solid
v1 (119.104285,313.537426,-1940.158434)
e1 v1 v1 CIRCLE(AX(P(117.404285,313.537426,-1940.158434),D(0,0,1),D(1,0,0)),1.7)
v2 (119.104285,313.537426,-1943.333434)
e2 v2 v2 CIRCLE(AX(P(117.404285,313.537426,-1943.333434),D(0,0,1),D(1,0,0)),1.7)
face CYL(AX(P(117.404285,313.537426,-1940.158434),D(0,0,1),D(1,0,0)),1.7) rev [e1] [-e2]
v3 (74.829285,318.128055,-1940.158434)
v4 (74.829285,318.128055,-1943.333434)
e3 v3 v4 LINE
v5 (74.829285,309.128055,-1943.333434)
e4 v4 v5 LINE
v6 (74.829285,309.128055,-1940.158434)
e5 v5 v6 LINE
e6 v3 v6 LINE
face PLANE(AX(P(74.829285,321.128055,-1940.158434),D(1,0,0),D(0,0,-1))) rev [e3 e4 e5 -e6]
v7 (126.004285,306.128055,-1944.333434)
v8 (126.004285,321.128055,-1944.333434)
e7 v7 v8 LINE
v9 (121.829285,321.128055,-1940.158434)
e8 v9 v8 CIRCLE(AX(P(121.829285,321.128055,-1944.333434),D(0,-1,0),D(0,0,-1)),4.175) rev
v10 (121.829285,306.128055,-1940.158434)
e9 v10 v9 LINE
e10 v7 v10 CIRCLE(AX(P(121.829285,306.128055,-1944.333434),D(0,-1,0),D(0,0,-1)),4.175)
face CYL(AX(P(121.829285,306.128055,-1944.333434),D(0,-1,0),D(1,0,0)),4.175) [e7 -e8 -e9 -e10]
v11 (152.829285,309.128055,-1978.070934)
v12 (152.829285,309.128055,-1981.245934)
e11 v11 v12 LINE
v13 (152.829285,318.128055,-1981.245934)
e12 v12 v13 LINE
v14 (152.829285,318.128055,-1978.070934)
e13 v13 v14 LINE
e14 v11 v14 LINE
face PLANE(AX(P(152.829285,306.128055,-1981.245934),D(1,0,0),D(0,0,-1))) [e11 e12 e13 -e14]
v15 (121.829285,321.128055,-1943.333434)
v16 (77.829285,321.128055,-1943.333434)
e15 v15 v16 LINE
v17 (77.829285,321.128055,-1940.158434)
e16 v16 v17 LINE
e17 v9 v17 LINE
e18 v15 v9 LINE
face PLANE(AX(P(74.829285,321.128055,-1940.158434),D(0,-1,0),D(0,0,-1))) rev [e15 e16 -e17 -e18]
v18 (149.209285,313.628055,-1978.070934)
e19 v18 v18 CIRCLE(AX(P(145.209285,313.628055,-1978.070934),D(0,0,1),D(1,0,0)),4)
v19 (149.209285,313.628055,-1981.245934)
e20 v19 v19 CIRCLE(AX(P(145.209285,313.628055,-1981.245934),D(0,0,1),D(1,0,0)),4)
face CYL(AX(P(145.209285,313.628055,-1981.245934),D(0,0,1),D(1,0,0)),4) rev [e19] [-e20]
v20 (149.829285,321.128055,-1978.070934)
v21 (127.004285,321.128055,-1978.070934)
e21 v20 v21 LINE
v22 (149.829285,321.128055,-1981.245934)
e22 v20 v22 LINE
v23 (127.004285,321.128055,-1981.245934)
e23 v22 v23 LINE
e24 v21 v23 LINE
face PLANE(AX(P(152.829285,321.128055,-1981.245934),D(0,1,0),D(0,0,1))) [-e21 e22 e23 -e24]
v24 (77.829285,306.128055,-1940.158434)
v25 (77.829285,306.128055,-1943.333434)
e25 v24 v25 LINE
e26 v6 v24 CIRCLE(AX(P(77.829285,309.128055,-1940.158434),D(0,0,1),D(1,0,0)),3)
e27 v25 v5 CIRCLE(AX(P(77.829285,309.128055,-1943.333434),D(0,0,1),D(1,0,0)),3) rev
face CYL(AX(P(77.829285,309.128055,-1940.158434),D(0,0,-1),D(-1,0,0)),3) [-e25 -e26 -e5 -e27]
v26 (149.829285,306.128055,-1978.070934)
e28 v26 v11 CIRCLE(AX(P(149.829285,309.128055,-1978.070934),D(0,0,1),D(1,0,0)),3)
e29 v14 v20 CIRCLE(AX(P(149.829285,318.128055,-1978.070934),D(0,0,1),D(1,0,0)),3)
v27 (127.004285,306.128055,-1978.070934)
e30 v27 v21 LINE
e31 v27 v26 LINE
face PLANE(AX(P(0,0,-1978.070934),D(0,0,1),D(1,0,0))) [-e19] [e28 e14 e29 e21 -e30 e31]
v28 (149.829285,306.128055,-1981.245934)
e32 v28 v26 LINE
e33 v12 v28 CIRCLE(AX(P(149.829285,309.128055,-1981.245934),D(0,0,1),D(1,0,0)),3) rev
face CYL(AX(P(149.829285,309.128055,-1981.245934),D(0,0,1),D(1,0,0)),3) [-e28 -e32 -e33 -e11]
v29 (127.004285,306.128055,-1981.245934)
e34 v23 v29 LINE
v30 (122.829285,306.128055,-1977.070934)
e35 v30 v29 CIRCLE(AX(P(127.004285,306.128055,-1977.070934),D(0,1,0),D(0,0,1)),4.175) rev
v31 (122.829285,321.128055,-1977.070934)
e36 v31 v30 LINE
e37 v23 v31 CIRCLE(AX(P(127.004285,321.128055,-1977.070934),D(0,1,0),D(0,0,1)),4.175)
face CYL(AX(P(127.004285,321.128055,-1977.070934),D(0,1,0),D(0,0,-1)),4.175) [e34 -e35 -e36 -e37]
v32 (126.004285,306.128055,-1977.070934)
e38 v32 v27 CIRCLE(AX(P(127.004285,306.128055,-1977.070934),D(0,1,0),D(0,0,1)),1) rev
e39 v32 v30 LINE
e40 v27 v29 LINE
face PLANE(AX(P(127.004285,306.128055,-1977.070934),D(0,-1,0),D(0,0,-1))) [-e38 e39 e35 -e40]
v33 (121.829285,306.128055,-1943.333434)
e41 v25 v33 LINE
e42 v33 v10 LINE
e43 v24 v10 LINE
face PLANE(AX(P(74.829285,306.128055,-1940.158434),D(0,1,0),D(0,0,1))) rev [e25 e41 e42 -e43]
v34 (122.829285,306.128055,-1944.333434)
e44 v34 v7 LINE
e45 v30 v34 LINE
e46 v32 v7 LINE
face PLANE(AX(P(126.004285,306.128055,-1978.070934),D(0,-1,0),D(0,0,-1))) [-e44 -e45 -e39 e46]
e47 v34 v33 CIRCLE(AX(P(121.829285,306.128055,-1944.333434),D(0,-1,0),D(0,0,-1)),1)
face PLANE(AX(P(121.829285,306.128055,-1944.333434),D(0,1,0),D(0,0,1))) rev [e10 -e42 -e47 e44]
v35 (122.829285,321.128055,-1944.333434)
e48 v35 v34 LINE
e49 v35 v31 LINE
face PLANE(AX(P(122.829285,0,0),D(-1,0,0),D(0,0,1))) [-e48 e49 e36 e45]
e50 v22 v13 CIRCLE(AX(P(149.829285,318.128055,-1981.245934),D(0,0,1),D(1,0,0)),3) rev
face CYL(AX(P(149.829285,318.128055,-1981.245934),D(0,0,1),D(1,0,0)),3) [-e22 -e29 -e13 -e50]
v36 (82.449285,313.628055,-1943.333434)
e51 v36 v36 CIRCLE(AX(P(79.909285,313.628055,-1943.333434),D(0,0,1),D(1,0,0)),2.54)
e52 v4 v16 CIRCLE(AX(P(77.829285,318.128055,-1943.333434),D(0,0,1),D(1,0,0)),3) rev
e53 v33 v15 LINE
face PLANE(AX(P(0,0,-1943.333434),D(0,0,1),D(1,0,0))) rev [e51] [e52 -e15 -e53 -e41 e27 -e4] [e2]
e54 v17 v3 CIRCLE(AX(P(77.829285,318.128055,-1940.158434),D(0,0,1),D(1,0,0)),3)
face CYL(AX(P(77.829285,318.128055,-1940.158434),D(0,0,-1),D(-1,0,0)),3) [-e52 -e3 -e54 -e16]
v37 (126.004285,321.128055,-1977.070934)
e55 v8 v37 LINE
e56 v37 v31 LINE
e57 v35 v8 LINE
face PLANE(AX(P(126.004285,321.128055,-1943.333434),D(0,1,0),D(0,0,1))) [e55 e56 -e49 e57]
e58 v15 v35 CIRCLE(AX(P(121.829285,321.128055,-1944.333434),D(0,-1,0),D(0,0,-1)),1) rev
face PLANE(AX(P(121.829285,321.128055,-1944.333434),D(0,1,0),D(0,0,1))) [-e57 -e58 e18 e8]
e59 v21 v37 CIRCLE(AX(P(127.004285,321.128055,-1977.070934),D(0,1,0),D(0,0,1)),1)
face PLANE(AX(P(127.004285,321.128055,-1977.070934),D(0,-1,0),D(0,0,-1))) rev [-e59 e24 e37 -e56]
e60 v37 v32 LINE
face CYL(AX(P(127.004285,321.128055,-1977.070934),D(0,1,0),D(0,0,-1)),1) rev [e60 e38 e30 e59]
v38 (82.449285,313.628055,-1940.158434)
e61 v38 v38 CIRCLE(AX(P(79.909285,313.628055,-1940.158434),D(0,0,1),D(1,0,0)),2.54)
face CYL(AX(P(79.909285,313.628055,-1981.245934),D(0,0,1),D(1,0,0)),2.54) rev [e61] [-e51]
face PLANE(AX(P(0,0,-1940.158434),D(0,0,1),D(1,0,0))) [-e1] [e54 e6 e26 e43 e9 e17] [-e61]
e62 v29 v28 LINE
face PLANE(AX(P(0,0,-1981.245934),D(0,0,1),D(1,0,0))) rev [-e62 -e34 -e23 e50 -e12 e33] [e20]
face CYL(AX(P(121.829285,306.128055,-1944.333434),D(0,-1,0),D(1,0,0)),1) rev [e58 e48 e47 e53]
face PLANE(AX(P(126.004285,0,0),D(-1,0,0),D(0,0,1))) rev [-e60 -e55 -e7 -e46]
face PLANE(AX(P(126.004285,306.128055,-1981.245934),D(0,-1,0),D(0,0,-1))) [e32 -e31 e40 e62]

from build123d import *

# Parameters (mm, degrees)
SKETCH1_W                    = 48
SKETCH1_H                    = 15
BASE_FLANGE1_DEPTH           = 3.175
EDGE_FLANGE1_STRIP_W         = 14.7
EDGE_FLANGE1_STRIP_H         = 3.175
EDGE_FLANGE1_STRIP_CUT_DEPTH = 15
EDGE_FLANGE1_DEPTH           = 15
EDGE_FLANGE2_STRIP_W         = 14.7
EDGE_FLANGE2_STRIP_H         = 3.175
EDGE_FLANGE2_STRIP_CUT_DEPTH = 15
EDGE_FLANGE2_DEPTH           = 15
FILLET1_R                    = 3
SKETCH18_R                   = 2.54
CUT_EXTRUDE2_DEPTH           = 359.005866467
SKETCH19_R                   = 4
CUT_EXTRUDE3_DEPTH           = 358.655386406
M3_CLEARANCE_HOLE1_D         = 3.4


# Sheet-metal steps are written as plain solids
with BuildPart() as part:
    # Sketch1 → Base-Flange1 (new body)
    with BuildSketch(Plane.XY.offset(-1943.333434301)):
        with Locations((98.829284585, 313.628054742)):
            Rectangle(SKETCH1_W, SKETCH1_H)
    extrude(amount=BASE_FLANGE1_DEPTH)

    # Edge-Flange1 strip (across the edge) → Edge-Flange1 strip cut (cut)
    with BuildSketch(Plane(origin=(122.829284585, 321.128054742, -1943.333434301), x_dir=(-1, 0, 0), z_dir=(0, -1, 0))):
        with Locations((-6.35, -1.5875)):
            Rectangle(EDGE_FLANGE1_STRIP_W, EDGE_FLANGE1_STRIP_H)
    extrude(amount=EDGE_FLANGE1_STRIP_CUT_DEPTH, mode=Mode.SUBTRACT)

    # Edge-Flange1 section (across the edge) → Edge-Flange1 (add)
    with BuildSketch(Plane(origin=(122.829284585, 321.128054742, -1943.333434301), x_dir=(-1, 0, 0), z_dir=(0, -1, 0))):
        with BuildLine():
            Line((-3.175, 1), (-3.175, 34.7375))
            Line((-3.175, 34.7375), (0, 34.7375))
            Line((0, 34.7375), (0, 1))
            ThreePointArc((0, 1), (0.292893219, 0.292893219), (1, 0))
            Line((1, 0), (1, -3.175))
            ThreePointArc((1, -3.175), (-1.952170811, -1.952170811), (-3.175, 1))
        make_face()
    extrude(amount=EDGE_FLANGE1_DEPTH)

    # Edge-Flange2 strip (across the edge) → Edge-Flange2 strip cut (cut)
    with BuildSketch(Plane(origin=(126.004284585, 306.128054742, -1978.070934301), x_dir=(0, 0, 1), z_dir=(0, 1, 0))):
        with Locations((-6.35, -1.5875)):
            Rectangle(EDGE_FLANGE2_STRIP_W, EDGE_FLANGE2_STRIP_H)
    extrude(amount=EDGE_FLANGE2_STRIP_CUT_DEPTH, mode=Mode.SUBTRACT)

    # Edge-Flange2 section (across the edge) → Edge-Flange2 (add)
    with BuildSketch(Plane(origin=(126.004284585, 306.128054742, -1978.070934301), x_dir=(0, 0, 1), z_dir=(0, 1, 0))):
        with BuildLine():
            Line((-3.175, 1), (-3.175, 26.825))
            Line((-3.175, 26.825), (0, 26.825))
            Line((0, 26.825), (0, 1))
            ThreePointArc((0, 1), (0.292893219, 0.292893219), (1, 0))
            Line((1, 0), (1, -3.175))
            ThreePointArc((1, -3.175), (-1.952170811, -1.952170811), (-3.175, 1))
        make_face()
    extrude(amount=EDGE_FLANGE2_DEPTH)

    # Fillet1
    fillet1_edges = [part.edges().sort_by_distance(p)[0] for p in [
        (152.829284585, 306.128054742, -1979.658434301),
        (152.829284585, 321.128054742, -1979.658434301),
        (74.829284585, 306.128054742, -1941.745934301),
        (74.829284585, 321.128054742, -1941.745934301),
    ]]
    fillet(fillet1_edges, radius=FILLET1_R)

    # Sketch18 → Cut-Extrude2 (cut, through all)
    with BuildSketch(Plane.XY.offset(-1940.158434301)):
        with Locations((79.909284585, 313.628054742)):
            Circle(SKETCH18_R)
    extrude(amount=-CUT_EXTRUDE2_DEPTH, mode=Mode.SUBTRACT)

    # Sketch19 → Cut-Extrude3 (cut, through all)
    with BuildSketch(Plane.XY.offset(-1978.070934301)):
        with Locations((145.209284585, 313.628054742)):
            Circle(SKETCH19_R)
    extrude(amount=-CUT_EXTRUDE3_DEPTH, mode=Mode.SUBTRACT)

    # M3 Clearance Hole1 (through all)
    with Locations(Plane.XY.offset(-1940.158434301)):
        with Locations((117.404284585, 313.537425755)):
            Hole(M3_CLEARANCE_HOLE1_D / 2)


solid = part.part
